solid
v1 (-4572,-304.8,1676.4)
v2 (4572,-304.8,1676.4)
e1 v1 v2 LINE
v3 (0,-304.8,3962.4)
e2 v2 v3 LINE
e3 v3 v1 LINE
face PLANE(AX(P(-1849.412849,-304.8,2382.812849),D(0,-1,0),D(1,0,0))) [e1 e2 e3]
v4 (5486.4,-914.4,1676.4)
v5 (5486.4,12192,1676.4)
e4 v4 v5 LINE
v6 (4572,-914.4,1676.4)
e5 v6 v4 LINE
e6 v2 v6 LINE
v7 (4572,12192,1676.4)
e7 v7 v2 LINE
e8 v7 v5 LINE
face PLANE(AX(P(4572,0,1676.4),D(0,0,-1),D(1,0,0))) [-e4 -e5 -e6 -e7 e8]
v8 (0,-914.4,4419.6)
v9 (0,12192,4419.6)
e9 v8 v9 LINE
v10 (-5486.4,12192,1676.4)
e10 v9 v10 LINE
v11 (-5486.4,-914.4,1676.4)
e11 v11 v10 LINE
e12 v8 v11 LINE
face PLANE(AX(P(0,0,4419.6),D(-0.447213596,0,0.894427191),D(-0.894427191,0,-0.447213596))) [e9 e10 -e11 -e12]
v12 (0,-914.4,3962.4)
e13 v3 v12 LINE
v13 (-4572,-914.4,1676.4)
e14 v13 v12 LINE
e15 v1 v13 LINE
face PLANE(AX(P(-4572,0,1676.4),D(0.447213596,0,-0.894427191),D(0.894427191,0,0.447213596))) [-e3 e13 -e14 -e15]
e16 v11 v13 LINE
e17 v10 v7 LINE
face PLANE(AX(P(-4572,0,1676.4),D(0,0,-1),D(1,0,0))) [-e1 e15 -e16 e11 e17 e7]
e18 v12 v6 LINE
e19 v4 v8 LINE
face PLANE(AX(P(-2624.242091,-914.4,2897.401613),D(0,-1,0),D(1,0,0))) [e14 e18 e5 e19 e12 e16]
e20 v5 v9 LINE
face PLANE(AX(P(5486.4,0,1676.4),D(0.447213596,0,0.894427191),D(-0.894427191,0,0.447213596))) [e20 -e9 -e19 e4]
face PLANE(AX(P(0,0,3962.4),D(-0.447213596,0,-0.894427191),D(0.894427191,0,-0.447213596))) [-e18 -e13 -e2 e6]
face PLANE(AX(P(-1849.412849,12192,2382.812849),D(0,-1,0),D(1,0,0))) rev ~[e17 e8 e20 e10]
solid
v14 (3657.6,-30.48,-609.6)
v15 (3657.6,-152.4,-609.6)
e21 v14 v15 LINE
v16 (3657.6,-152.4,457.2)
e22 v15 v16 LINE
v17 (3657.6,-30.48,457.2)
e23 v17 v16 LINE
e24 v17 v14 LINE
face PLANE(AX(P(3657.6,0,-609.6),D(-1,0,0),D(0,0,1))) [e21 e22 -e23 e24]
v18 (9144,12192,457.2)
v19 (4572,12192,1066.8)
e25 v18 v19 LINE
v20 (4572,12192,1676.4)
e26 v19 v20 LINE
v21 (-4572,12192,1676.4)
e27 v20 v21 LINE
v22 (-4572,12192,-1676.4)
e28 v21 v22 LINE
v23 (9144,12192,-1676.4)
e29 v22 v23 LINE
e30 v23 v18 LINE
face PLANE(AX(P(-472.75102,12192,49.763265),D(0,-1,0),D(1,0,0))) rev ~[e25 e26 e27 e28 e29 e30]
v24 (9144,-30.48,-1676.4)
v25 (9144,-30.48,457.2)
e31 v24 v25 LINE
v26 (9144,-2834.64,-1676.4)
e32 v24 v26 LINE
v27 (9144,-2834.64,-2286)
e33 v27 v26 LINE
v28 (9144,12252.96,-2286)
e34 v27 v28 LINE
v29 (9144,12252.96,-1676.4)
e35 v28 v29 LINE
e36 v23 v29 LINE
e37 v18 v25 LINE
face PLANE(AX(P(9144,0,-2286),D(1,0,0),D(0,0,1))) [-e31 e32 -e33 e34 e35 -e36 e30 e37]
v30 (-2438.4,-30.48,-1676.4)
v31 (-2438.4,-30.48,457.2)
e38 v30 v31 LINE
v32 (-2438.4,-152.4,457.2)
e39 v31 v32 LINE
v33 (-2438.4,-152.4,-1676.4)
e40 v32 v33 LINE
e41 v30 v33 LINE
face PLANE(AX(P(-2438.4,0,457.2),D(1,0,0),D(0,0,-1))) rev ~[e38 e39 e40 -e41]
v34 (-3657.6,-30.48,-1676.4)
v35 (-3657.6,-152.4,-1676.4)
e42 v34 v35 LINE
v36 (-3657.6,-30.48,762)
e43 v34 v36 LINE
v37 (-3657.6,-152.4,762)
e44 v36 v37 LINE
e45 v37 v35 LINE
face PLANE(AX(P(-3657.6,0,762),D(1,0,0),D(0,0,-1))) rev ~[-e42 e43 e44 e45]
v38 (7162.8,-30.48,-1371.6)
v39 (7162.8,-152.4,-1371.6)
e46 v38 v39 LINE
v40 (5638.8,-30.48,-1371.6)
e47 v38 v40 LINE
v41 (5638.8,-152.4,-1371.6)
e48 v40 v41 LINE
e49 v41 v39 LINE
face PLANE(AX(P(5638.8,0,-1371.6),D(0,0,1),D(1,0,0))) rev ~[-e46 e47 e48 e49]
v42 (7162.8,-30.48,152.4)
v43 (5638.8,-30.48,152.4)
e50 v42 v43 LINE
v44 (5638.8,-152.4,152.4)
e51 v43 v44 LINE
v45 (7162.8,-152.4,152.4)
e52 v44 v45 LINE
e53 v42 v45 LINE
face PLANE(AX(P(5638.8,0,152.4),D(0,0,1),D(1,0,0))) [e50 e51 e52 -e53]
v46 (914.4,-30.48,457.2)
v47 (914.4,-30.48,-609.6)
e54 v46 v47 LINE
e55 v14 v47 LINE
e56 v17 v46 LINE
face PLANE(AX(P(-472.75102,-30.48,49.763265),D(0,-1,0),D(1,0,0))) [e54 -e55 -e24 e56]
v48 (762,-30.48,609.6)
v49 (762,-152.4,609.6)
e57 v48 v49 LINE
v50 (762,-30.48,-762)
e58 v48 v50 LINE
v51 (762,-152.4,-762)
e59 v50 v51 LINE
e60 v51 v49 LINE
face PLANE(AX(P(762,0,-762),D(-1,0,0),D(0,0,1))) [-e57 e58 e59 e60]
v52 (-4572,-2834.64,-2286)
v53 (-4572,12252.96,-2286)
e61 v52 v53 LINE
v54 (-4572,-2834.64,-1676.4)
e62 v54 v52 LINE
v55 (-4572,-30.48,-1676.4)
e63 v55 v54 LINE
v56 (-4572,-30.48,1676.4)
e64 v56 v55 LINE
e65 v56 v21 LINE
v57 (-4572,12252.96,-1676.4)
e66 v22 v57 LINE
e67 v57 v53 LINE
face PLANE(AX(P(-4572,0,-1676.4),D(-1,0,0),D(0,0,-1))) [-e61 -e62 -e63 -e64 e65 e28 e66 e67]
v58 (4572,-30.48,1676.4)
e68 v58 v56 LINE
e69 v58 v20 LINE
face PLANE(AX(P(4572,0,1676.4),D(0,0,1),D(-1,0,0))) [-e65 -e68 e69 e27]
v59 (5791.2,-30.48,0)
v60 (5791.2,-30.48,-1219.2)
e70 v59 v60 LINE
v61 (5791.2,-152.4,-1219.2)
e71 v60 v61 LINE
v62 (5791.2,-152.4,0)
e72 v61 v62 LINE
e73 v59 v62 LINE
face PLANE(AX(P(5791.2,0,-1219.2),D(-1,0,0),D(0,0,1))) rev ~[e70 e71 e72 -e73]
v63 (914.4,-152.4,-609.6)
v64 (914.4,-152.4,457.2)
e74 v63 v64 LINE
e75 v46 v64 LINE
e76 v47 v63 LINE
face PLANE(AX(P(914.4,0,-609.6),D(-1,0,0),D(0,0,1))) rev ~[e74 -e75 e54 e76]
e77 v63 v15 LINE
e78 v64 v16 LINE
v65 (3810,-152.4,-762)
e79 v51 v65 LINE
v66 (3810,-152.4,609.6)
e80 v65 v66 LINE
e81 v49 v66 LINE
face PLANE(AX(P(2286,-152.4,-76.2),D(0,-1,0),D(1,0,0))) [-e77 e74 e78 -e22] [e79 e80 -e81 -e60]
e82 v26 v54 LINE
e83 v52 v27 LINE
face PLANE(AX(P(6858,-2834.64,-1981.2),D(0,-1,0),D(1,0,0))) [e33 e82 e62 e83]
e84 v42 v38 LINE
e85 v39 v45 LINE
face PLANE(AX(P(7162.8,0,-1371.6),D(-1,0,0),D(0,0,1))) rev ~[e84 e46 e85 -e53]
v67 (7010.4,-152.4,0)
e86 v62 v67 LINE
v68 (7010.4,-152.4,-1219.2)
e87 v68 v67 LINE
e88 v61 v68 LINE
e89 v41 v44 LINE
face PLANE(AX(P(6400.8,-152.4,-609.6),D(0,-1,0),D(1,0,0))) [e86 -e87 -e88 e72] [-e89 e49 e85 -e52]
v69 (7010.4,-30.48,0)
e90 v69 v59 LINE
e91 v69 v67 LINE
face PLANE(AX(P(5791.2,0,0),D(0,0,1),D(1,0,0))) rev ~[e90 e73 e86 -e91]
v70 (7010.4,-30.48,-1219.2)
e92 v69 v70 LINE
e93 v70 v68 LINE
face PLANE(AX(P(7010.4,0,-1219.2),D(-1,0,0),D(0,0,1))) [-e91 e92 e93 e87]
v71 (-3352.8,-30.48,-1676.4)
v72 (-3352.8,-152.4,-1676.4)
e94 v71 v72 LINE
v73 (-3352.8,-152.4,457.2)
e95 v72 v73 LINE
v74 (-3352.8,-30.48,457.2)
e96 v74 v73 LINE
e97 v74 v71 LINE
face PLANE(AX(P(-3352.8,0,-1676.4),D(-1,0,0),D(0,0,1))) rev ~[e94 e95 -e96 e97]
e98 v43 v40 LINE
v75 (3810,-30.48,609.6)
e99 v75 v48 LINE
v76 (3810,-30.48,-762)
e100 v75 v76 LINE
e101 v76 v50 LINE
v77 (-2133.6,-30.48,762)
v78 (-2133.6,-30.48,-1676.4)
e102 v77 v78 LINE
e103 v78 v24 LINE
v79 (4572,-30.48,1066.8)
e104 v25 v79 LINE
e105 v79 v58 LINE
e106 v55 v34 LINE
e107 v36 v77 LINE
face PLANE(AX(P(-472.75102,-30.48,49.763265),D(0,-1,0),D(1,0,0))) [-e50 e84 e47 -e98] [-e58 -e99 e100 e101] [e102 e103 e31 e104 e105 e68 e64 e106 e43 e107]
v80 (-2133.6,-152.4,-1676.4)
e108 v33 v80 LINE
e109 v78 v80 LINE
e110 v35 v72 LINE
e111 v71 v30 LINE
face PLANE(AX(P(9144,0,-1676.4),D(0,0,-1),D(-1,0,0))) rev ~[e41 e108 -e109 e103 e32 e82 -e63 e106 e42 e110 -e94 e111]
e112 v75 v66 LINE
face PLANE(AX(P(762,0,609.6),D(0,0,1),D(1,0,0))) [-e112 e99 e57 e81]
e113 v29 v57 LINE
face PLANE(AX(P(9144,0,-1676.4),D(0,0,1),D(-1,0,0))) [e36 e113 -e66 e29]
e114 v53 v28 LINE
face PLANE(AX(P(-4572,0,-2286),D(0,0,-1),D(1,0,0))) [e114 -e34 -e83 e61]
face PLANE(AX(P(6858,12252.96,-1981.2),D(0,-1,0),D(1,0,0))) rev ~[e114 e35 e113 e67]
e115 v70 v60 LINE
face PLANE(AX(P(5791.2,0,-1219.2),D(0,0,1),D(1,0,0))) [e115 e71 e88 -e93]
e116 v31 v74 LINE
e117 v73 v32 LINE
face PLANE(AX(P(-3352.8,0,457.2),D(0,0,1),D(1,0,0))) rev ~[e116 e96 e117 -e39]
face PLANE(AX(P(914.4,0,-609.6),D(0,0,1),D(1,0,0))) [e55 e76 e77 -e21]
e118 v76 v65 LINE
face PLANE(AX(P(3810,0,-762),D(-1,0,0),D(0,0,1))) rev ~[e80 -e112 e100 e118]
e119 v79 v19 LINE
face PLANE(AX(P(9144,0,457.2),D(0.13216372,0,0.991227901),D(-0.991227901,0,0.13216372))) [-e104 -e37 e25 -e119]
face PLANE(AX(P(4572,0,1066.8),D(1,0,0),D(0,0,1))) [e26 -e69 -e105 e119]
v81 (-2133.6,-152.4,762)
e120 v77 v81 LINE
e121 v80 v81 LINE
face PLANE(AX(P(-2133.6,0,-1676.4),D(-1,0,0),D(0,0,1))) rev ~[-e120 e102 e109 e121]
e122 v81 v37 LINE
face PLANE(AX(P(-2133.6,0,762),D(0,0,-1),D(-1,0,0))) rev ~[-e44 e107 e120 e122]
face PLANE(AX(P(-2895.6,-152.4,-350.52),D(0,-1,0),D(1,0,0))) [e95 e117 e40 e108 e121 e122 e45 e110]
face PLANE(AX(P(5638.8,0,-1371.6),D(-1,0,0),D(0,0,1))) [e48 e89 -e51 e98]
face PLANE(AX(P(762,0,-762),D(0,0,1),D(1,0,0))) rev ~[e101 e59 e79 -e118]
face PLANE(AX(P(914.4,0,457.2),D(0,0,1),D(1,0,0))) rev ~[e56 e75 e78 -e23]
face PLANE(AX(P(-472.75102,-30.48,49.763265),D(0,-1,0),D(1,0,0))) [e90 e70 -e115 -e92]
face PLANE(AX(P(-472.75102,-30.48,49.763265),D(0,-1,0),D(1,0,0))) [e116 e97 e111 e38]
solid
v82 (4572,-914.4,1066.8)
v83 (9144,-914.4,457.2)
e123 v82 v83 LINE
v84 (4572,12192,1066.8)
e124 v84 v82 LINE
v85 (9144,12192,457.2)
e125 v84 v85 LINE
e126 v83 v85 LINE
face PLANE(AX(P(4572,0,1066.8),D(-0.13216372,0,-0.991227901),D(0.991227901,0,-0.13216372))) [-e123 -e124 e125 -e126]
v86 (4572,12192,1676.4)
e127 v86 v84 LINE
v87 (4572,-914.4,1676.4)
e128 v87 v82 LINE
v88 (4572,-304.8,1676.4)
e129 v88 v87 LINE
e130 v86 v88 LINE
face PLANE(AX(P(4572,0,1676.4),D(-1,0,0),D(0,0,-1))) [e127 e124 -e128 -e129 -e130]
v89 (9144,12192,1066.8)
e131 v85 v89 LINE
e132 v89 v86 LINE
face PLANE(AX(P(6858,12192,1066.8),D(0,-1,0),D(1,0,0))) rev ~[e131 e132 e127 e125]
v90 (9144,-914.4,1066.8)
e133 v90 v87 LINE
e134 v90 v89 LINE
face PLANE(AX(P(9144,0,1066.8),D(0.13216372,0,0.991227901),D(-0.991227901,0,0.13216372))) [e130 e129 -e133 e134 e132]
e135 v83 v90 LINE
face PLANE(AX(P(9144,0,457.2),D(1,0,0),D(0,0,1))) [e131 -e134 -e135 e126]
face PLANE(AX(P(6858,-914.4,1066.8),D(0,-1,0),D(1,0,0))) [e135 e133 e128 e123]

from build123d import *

# Parameters (mm, degrees)
F1_DEPTH      = 914.4
F1_DEPTH_BACK = 12192
F2_DEPTH      = 304.8
F2_DEPTH_BACK = 12192
F0_W          = 3048
F0_H          = 1371.6
F0_W_2        = 1524
F0_H_2        = 1524
F0_W_3        = 2743.2
F0_H_3        = 1066.8
F0_W_4        = 1219.2
F0_H_4        = 1219.2
F0_W_5        = 914.4
F0_H_5        = 2133.6
F3_DEPTH      = 30.48
F3_DEPTH_BACK = 12192
F4_DEPTH      = 152.4
F0_W_6        = 4572
F0_H_6        = 609.6
F5_DEPTH      = 2834.64
F5_DEPTH_BACK = 12252.96


# Not quite as in the source:
# - the program builds the solid bodies; features that only make, move or delete a surface that nothing else refers to are left out


with BuildPart() as f1:
    # F0 (on Front) → F1 (new body, two sides)
    with BuildSketch(Plane.XZ) as f1_sk:
        Polygon((-5486.4, 1676.4), (-4572, 1676.4), (0, 3962.4), (0, 4419.6), align=None)
        Polygon((0, 4419.6), (0, 3962.4), (4572, 1676.4), (5486.4, 1676.4), align=None)
    extrude(amount=F1_DEPTH)
    extrude(f1_sk.sketch, amount=-F1_DEPTH_BACK)



with BuildPart() as f1b:
    # F0 (on Front) → F1, piece 2 (new body, two sides)
    with BuildSketch(Plane.XZ) as f1_2_sk:
        Polygon((9144, 1066.8), (4572, 1676.4), (4572, 1066.8), (9144, 457.2), align=None)
    extrude(amount=F1_DEPTH)
    extrude(f1_2_sk.sketch, amount=-F1_DEPTH_BACK)


with BuildPart() as f1_1:
    add(f1.part)

    add(f1b.part)  # F2 merges F1b
    # F0 (on Front) → F2 (join, two sides)
    with BuildSketch(Plane.XZ) as f2_sk:
        Polygon((0, 3962.4), (-4572, 1676.4), (0, 1676.4), align=None)
        Polygon((0, 3962.4), (0, 1676.4), (4572, 1676.4), align=None)
    extrude(amount=F2_DEPTH)
    extrude(f2_sk.sketch, amount=-F2_DEPTH_BACK)


with BuildPart() as f3:
    # F0 (on Front) → F3 (new body, two sides)
    with BuildSketch(Plane.XZ) as f3_sk:
        Polygon((0, 1676.4), (-4572, 1676.4), (-4572, -1676.4), (-3657.6, -1676.4), (-3657.6, 762), (-2133.6, 762), (-2133.6, -1676.4), (4572, -1676.4), (4572, 1066.8), (4572, 1676.4), align=None)
        with Locations((2286, -76.2)):
            Rectangle(F0_W, F0_H, mode=Mode.SUBTRACT)
        Polygon((9144, 457.2), (4572, 1066.8), (4572, -1676.4), (9144, -1676.4), align=None)
        with Locations((6400.8, -609.6)):
            Rectangle(F0_W_2, F0_H_2, mode=Mode.SUBTRACT)
        with Locations((2286, -76.2)):
            Rectangle(F0_W, F0_H)
        with Locations((2286, -76.2)):
            Rectangle(F0_W_3, F0_H_3, mode=Mode.SUBTRACT)
        with Locations((2286, -76.2)):
            Rectangle(F0_W_3, F0_H_3)
        with Locations((6400.8, -609.6)):
            Rectangle(F0_W_2, F0_H_2)
        with Locations((6400.8, -609.6)):
            Rectangle(F0_W_4, F0_H_4, mode=Mode.SUBTRACT)
        with Locations((-2895.6, -609.6)):
            Rectangle(F0_W_5, F0_H_5)
        Polygon((-3657.6, 762), (-3657.6, -1676.4), (-3352.8, -1676.4), (-3352.8, 457.2), (-2438.4, 457.2), (-2438.4, -1676.4), (-2133.6, -1676.4), (-2133.6, 762), align=None)
        with Locations((6400.8, -609.6)):
            Rectangle(F0_W_4, F0_H_4)
    extrude(amount=F3_DEPTH)
    extrude(f3_sk.sketch, amount=-F3_DEPTH_BACK)

    # F0 (on Front) → F4 (join)
    with BuildSketch(Plane.XZ):
        Polygon((-3657.6, 762), (-3657.6, -1676.4), (-3352.8, -1676.4), (-3352.8, 457.2), (-2438.4, 457.2), (-2438.4, -1676.4), (-2133.6, -1676.4), (-2133.6, 762), align=None)
        with Locations((2286, -76.2)):
            Rectangle(F0_W, F0_H)
        with Locations((2286, -76.2)):
            Rectangle(F0_W_3, F0_H_3, mode=Mode.SUBTRACT)
        with Locations((6400.8, -609.6)):
            Rectangle(F0_W_2, F0_H_2)
        with Locations((6400.8, -609.6)):
            Rectangle(F0_W_4, F0_H_4, mode=Mode.SUBTRACT)
    extrude(amount=F4_DEPTH)

    # F0 (on Front) → F5 (join, two sides)
    with BuildSketch(Plane.XZ) as f5_sk:
        with Locations((6858, -1981.2)):
            Rectangle(F0_W_6, F0_H_6)
        Polygon((-3657.6, -1676.4), (-4572, -1676.4), (-4572, -2286), (4572, -2286), (4572, -1676.4), (-2133.6, -1676.4), (-2438.4, -1676.4), (-3352.8, -1676.4), align=None)
    extrude(amount=F5_DEPTH)
    extrude(f5_sk.sketch, amount=-F5_DEPTH_BACK)


solid = Compound([f1_1.part, f3.part])
